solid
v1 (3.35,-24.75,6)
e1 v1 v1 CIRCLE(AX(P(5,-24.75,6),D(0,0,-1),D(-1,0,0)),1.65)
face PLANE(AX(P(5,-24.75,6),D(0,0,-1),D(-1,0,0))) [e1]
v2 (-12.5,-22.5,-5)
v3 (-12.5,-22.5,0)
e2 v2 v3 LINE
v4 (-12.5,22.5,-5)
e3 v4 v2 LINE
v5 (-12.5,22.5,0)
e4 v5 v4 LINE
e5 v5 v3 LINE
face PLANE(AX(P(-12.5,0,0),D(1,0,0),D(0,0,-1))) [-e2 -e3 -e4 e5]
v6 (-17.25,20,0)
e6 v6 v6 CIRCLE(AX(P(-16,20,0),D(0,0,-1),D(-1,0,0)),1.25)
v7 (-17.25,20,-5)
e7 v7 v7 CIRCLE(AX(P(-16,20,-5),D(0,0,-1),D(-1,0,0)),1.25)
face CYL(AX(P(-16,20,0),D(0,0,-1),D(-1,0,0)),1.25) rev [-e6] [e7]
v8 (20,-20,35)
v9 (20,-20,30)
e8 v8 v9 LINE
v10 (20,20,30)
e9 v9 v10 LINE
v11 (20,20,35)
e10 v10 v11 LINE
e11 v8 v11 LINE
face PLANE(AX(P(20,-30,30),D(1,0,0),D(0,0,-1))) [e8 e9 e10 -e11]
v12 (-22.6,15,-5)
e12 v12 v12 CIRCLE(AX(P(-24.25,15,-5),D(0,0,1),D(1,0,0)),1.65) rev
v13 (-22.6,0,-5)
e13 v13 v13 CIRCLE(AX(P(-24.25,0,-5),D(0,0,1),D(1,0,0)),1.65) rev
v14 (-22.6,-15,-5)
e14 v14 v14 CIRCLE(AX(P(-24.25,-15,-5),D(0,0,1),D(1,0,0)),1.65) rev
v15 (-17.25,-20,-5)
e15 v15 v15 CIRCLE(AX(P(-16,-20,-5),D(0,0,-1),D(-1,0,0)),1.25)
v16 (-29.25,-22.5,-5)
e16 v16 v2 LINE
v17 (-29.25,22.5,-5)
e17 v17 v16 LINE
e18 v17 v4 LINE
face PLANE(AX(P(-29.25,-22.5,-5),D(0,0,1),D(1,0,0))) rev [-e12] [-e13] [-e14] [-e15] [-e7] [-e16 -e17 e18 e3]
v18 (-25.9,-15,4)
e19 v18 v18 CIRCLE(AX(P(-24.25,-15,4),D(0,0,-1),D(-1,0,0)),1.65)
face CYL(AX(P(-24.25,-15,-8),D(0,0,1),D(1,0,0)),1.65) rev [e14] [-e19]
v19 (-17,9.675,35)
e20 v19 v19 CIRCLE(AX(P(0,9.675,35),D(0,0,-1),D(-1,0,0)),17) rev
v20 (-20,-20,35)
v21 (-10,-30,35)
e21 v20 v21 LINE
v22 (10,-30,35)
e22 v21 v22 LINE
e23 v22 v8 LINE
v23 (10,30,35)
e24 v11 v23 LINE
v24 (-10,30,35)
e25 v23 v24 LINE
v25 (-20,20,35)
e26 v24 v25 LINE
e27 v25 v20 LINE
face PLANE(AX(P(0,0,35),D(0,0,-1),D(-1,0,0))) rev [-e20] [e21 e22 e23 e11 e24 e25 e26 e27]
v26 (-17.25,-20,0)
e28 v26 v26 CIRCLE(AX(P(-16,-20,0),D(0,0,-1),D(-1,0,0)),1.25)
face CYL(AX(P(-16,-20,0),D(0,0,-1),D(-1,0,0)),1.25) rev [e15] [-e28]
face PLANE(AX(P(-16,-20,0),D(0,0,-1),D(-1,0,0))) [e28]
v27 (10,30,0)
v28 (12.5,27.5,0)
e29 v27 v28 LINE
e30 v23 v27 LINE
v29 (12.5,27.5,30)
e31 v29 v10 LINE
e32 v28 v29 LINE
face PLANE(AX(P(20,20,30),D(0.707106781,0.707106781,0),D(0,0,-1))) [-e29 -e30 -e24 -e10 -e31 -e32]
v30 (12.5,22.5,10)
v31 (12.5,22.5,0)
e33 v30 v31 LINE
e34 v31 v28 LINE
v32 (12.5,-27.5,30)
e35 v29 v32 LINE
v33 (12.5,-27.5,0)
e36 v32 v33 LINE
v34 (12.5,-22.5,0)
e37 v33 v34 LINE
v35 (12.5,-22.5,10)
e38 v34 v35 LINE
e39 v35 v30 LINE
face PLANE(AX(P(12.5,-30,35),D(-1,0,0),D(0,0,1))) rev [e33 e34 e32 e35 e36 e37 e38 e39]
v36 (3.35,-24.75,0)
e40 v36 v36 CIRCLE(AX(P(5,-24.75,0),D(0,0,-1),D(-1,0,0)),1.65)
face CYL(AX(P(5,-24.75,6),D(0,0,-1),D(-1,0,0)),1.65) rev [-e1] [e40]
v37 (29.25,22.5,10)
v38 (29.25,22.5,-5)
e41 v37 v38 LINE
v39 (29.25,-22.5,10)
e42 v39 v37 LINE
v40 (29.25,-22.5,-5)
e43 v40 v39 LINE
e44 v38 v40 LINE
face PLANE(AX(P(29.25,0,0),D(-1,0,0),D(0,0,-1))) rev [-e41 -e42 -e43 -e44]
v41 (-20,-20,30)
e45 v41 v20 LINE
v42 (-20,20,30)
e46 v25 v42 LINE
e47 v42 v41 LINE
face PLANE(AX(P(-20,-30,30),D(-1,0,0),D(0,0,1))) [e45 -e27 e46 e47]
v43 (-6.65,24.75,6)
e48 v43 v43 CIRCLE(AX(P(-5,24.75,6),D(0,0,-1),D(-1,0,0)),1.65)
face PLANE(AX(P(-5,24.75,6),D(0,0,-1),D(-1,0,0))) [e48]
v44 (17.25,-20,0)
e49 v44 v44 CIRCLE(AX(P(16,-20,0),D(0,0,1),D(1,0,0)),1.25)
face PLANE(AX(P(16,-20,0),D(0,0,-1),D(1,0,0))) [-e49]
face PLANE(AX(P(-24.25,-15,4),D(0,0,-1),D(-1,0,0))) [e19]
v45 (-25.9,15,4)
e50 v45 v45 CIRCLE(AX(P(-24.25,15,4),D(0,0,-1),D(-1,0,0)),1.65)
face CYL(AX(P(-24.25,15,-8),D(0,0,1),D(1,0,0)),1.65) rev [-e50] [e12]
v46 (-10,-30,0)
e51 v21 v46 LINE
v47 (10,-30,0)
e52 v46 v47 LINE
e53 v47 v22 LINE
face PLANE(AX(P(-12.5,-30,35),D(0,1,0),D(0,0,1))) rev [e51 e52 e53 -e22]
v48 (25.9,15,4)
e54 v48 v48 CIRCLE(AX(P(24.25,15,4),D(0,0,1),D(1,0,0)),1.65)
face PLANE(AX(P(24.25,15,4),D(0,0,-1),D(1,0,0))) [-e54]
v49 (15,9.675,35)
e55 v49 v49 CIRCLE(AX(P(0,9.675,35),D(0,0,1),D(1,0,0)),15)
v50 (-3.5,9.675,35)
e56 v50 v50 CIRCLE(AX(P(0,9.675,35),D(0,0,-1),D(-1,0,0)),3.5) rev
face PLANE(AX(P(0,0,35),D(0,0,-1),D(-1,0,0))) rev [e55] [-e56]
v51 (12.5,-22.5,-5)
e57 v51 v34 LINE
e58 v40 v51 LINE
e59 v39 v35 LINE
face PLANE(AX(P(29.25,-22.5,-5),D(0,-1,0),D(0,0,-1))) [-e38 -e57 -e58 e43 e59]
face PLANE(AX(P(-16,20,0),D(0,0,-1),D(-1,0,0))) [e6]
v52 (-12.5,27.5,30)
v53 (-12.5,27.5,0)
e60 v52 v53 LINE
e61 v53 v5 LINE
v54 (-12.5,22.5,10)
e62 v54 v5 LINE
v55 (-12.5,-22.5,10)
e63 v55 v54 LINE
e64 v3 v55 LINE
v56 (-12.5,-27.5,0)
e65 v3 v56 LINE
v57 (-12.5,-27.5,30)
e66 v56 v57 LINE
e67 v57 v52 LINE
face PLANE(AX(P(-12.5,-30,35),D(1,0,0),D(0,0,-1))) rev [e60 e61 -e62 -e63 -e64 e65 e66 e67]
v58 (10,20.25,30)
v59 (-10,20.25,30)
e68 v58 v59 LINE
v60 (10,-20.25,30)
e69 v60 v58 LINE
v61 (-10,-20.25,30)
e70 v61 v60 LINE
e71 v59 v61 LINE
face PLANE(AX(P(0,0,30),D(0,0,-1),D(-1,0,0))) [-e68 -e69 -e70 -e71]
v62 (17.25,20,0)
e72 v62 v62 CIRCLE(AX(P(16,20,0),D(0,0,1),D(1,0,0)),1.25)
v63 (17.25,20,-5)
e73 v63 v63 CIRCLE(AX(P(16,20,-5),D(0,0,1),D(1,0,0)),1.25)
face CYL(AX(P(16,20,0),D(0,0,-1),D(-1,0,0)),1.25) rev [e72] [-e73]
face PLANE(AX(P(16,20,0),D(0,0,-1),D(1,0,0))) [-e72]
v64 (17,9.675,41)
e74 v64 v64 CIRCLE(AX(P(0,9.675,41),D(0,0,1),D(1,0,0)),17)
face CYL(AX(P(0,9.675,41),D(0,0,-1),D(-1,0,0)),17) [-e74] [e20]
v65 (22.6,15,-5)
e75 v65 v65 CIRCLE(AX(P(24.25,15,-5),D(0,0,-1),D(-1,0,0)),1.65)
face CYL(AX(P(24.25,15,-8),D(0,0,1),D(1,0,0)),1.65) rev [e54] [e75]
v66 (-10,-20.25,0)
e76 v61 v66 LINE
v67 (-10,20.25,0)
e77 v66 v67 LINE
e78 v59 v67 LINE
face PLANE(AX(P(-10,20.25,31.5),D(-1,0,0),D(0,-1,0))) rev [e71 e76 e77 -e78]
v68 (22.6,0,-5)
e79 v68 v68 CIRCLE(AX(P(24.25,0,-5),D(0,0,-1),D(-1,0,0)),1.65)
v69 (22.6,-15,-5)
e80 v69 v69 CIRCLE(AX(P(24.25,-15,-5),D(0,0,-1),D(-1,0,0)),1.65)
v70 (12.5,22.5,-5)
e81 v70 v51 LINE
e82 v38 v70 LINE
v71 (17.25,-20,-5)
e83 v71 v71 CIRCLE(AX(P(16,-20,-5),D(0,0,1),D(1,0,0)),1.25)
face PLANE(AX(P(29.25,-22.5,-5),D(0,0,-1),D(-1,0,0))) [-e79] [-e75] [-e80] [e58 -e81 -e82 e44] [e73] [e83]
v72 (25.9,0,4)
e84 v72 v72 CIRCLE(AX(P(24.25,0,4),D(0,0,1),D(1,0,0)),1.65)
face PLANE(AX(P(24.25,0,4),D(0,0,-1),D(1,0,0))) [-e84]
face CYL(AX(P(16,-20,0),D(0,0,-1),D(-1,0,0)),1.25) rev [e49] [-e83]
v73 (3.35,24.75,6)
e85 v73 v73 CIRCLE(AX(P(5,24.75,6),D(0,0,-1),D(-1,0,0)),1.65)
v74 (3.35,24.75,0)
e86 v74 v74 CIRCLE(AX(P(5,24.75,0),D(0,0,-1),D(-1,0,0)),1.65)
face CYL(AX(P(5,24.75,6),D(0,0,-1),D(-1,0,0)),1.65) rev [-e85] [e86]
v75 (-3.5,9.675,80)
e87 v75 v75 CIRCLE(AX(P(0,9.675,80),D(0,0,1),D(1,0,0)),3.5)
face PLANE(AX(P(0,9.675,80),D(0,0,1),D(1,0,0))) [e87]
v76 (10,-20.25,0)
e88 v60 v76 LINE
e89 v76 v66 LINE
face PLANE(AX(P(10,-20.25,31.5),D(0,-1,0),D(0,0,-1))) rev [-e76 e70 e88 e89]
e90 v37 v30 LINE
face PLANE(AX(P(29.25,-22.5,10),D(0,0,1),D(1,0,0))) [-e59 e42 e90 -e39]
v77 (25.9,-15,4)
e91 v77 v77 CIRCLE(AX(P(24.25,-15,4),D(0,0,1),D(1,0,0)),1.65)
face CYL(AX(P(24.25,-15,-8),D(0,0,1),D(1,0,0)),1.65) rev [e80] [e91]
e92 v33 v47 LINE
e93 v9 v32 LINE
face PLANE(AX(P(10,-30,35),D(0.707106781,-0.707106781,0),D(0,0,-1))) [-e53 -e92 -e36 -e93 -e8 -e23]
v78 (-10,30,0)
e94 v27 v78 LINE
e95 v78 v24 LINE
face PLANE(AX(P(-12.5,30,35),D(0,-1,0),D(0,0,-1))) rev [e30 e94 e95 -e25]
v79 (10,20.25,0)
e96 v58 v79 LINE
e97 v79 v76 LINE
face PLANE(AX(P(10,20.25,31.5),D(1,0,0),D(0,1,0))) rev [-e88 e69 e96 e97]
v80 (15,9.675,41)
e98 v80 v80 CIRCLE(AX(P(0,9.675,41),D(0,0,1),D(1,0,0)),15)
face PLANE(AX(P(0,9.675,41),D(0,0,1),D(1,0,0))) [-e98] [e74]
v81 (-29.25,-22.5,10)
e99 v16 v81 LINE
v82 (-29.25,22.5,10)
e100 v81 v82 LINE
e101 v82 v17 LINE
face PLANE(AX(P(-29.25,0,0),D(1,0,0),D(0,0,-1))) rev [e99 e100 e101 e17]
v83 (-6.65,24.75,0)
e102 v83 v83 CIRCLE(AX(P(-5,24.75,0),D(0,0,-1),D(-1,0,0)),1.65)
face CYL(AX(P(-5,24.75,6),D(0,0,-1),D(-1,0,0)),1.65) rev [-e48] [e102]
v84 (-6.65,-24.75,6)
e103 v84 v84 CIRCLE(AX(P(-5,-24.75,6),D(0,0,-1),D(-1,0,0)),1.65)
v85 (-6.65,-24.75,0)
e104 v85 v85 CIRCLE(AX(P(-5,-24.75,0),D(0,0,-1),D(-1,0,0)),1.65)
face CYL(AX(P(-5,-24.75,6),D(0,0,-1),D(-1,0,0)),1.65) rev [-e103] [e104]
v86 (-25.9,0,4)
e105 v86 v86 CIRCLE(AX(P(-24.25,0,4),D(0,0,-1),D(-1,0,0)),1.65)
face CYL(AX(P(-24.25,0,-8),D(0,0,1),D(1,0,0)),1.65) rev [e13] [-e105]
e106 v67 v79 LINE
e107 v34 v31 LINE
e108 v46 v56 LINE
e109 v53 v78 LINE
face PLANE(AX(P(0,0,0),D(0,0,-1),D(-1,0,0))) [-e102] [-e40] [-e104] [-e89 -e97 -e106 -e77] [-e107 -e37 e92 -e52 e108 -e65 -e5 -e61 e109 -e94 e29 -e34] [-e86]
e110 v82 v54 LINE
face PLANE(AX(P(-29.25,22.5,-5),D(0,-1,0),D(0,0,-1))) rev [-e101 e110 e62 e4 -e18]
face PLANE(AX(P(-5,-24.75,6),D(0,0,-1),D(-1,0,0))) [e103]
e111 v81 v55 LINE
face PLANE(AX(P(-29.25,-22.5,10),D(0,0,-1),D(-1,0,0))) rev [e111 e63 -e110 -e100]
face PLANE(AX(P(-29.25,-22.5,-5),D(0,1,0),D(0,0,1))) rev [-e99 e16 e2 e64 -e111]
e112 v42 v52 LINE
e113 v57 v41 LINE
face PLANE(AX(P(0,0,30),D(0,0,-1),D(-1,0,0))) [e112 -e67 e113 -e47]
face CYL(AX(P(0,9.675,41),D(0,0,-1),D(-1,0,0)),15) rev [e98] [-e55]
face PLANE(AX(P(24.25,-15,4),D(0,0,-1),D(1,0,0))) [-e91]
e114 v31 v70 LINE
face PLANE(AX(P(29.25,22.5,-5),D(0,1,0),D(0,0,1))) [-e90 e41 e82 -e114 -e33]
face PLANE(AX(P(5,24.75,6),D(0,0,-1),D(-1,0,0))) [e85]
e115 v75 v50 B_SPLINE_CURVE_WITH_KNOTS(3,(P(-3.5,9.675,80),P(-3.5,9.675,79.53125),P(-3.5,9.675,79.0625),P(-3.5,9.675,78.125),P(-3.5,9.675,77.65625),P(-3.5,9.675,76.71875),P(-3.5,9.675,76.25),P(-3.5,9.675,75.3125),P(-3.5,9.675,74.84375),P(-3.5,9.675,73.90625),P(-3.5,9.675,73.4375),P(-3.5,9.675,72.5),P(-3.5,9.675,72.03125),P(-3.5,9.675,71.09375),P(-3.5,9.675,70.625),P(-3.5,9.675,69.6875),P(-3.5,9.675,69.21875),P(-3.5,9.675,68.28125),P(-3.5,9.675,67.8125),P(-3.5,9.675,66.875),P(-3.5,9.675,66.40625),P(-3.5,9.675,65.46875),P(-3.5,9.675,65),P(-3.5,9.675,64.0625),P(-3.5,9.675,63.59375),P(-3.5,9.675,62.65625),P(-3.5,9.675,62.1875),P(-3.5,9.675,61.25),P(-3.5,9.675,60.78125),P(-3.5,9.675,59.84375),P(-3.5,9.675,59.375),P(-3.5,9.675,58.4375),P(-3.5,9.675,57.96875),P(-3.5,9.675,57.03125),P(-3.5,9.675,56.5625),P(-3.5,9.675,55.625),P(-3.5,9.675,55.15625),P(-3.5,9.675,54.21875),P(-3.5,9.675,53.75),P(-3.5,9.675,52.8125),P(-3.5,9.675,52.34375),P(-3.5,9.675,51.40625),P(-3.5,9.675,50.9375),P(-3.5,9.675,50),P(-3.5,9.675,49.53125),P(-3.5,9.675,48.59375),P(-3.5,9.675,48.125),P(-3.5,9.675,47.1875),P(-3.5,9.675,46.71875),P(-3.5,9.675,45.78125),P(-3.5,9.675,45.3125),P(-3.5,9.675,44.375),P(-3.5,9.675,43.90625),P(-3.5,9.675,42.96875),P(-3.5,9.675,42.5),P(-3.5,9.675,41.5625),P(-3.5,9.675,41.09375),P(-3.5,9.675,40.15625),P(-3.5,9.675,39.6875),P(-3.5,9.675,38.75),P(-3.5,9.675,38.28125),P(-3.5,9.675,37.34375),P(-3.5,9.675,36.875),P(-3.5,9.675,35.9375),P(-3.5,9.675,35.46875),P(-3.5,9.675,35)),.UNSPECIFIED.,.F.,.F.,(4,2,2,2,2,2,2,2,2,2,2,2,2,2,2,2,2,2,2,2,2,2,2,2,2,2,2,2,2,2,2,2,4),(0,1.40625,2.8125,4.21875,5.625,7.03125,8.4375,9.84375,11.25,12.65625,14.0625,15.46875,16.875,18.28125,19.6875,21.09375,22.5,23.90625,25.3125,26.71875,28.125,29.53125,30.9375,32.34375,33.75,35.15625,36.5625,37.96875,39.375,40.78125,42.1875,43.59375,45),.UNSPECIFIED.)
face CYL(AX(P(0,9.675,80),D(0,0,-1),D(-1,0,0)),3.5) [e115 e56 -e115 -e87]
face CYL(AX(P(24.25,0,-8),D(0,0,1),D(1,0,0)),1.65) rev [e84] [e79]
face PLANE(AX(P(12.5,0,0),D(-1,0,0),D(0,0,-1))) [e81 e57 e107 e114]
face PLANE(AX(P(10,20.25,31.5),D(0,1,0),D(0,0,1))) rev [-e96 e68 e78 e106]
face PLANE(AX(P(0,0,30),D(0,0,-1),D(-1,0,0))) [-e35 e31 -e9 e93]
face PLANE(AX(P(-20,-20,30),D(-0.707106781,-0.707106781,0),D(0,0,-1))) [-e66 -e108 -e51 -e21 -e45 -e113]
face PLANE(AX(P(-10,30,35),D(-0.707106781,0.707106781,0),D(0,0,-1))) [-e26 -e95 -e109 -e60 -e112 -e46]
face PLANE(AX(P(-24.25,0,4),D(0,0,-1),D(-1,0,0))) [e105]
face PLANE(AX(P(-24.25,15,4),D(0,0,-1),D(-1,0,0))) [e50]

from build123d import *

# Parameters (mm, degrees)
SKETCH_1_W          = 25
SKETCH_1_H          = 60
EXTRUDE_1_DEPTH     = 35
SKETCH_2_W          = 20
SKETCH_2_H          = 40.5
CUT_EXTRUDE_1_DEPTH = 31.5
SKETCH_5_W          = 40
SKETCH_5_H          = 60
EXTRUDE_4_DEPTH     = 5
SKETCH_6_R          = 1.65
CUT_EXTRUDE_2_DEPTH = 6
SKETCH_10_W         = 15
SKETCH_10_H         = 45
EXTRUDE_7_DEPTH     = 16.75
SKETCH_18_R         = 1.25
CUT_EXTRUDE_4_DEPTH = 5
CUT_EXTRUDE_START   = -4
SKETCH_17_R         = 1.65
CUT_EXTRUDE_3_DEPTH = 12
SKETCH_13_R         = 3.5
EXTRUDE_10_DEPTH    = 45
SKETCH_15_R         = 17
SKETCH_15_R_2       = 15
EXTRUDE_11_DEPTH    = 6
CHAMFER_START       = 30
CHAMFER_3_DEPTH     = 5
CHAMFER_START_2     = -1
CHAMFER_3_2_DEPTH   = 31


with BuildPart() as part:
    # 草圖1 → 填料-伸長1 (new body)
    with BuildSketch(Plane.XY):
        Rectangle(SKETCH_1_W, SKETCH_1_H)
    extrude(amount=EXTRUDE_1_DEPTH)

    # 草圖2 → 除料-伸長1 (cut)
    with BuildSketch(Plane(origin=(0, 0, 0), x_dir=(-1, 0, 0), z_dir=(0, 0, -1))):
        Rectangle(SKETCH_2_W, SKETCH_2_H)
    extrude(amount=-CUT_EXTRUDE_1_DEPTH, mode=Mode.SUBTRACT)

    # 草圖5 → 填料-伸長4 (add)
    with BuildSketch(Plane.XY.offset(35)):
        Rectangle(SKETCH_5_W, SKETCH_5_H)
    extrude(amount=-EXTRUDE_4_DEPTH)

    # 草圖6 → 除料-伸長2 (cut)
    with BuildSketch(Plane(origin=(0, 0, 0), x_dir=(-1, 0, 0), z_dir=(0, 0, -1))):
        with Locations((5, 24.75)):
            Circle(SKETCH_6_R)
        with Locations((-5, 24.75)):
            Circle(SKETCH_6_R)
        with Locations((-5, -24.75)):
            Circle(SKETCH_6_R)
        with Locations((5, -24.75)):
            Circle(SKETCH_6_R)
    extrude(amount=-CUT_EXTRUDE_2_DEPTH, mode=Mode.SUBTRACT)

    # 草圖10 → 填料-伸長7 (add)
    with BuildSketch(Plane.ZY.offset(12.5)):
        with Locations((2.5, 0)):
            Rectangle(SKETCH_10_W, SKETCH_10_H)
    extrude_7 = extrude(amount=EXTRUDE_7_DEPTH)

    # 草圖18 → 除料-伸長4 (cut)
    with BuildSketch(Plane(origin=(0, 0, -5), x_dir=(-1, 0, 0), z_dir=(0, 0, -1))):
        with Locations((16, -20)):
            Circle(SKETCH_18_R)
        with Locations((16, 20)):
            Circle(SKETCH_18_R)
    cut_extrude_4 = extrude(amount=-CUT_EXTRUDE_4_DEPTH, mode=Mode.SUBTRACT)

    # 草圖17 → 除料-伸長3 (cut)
    with BuildSketch(Plane(origin=(0, 0, 0), x_dir=(-1, 0, 0), z_dir=(0, 0, -1)).offset(CUT_EXTRUDE_START)):
        with Locations(Location((24.25, 0, 0), (0, 0, 180))):
            Circle(SKETCH_17_R)
        with Locations(Location((24.25, -15, 0), (0, 0, 180))):
            Circle(SKETCH_17_R)
        with Locations(Location((24.25, 15, 0), (0, 0, 180))):
            Circle(SKETCH_17_R)
    cut_extrude_3 = extrude(amount=CUT_EXTRUDE_3_DEPTH, mode=Mode.SUBTRACT)

    # 鏡射1: 填料-伸長7, 除料-伸長4, 除料-伸長3 across plane
    add(extrude_7.mirror(Plane(origin=(0, 0, 0), x_dir=(0, 0, 1), z_dir=(1, 0, 0))))
    add(cut_extrude_4.mirror(Plane(origin=(0, 0, 0), x_dir=(0, 0, 1), z_dir=(1, 0, 0))), mode=Mode.SUBTRACT)
    add(cut_extrude_3.mirror(Plane(origin=(0, 0, 0), x_dir=(0, 0, 1), z_dir=(1, 0, 0))), mode=Mode.SUBTRACT)

    # 草圖13 → 填料-伸長10 (add)
    with BuildSketch(Plane.XY.offset(35)):
        with Locations(Location((0, 9.675, 0), (0, 0, 180))):
            Circle(SKETCH_13_R)
    extrude(amount=EXTRUDE_10_DEPTH)

    # 草圖15 → 填料-伸長11 (add)
    with BuildSketch(Plane.XY.offset(35)):
        with Locations(Location((0, 9.675, 0), (0, 0, 180))):
            Circle(SKETCH_15_R)
        with Locations((0, 9.675)):
            Circle(SKETCH_15_R_2, mode=Mode.SUBTRACT)
    extrude(amount=EXTRUDE_11_DEPTH)

    # 導角3: read off the stored shape, not the designer's step
    # 導角3 outline → 導角3 (cut)
    with BuildSketch(Plane.XY.offset(CHAMFER_START)):
        Polygon((20, 20), (20, 30), (10, 30), align=None)
        Polygon((20, -30), (20, -20), (10, -30), align=None)
        Polygon((-10, 30), (-20, 30), (-20, 20), align=None)
        Polygon((-10, -30), (-20, -20), (-20, -30), align=None)
    extrude(amount=CHAMFER_3_DEPTH, mode=Mode.SUBTRACT)

    # Chamfer 3 2 outline → Chamfer 3 2 (cut)
    with BuildSketch(Plane.XY.offset(CHAMFER_START_2)):
        Polygon((10, 30), (12.5, 27.5), (12.5, 30), align=None)
        Polygon((12.5, -30), (12.5, -27.5), (10, -30), align=None)
        Polygon((-12.5, 27.5), (-10, 30), (-12.5, 30), align=None)
        Polygon((-12.5, -30), (-10, -30), (-12.5, -27.5), align=None)
    extrude(amount=CHAMFER_3_2_DEPTH, mode=Mode.SUBTRACT)


solid = part.part
